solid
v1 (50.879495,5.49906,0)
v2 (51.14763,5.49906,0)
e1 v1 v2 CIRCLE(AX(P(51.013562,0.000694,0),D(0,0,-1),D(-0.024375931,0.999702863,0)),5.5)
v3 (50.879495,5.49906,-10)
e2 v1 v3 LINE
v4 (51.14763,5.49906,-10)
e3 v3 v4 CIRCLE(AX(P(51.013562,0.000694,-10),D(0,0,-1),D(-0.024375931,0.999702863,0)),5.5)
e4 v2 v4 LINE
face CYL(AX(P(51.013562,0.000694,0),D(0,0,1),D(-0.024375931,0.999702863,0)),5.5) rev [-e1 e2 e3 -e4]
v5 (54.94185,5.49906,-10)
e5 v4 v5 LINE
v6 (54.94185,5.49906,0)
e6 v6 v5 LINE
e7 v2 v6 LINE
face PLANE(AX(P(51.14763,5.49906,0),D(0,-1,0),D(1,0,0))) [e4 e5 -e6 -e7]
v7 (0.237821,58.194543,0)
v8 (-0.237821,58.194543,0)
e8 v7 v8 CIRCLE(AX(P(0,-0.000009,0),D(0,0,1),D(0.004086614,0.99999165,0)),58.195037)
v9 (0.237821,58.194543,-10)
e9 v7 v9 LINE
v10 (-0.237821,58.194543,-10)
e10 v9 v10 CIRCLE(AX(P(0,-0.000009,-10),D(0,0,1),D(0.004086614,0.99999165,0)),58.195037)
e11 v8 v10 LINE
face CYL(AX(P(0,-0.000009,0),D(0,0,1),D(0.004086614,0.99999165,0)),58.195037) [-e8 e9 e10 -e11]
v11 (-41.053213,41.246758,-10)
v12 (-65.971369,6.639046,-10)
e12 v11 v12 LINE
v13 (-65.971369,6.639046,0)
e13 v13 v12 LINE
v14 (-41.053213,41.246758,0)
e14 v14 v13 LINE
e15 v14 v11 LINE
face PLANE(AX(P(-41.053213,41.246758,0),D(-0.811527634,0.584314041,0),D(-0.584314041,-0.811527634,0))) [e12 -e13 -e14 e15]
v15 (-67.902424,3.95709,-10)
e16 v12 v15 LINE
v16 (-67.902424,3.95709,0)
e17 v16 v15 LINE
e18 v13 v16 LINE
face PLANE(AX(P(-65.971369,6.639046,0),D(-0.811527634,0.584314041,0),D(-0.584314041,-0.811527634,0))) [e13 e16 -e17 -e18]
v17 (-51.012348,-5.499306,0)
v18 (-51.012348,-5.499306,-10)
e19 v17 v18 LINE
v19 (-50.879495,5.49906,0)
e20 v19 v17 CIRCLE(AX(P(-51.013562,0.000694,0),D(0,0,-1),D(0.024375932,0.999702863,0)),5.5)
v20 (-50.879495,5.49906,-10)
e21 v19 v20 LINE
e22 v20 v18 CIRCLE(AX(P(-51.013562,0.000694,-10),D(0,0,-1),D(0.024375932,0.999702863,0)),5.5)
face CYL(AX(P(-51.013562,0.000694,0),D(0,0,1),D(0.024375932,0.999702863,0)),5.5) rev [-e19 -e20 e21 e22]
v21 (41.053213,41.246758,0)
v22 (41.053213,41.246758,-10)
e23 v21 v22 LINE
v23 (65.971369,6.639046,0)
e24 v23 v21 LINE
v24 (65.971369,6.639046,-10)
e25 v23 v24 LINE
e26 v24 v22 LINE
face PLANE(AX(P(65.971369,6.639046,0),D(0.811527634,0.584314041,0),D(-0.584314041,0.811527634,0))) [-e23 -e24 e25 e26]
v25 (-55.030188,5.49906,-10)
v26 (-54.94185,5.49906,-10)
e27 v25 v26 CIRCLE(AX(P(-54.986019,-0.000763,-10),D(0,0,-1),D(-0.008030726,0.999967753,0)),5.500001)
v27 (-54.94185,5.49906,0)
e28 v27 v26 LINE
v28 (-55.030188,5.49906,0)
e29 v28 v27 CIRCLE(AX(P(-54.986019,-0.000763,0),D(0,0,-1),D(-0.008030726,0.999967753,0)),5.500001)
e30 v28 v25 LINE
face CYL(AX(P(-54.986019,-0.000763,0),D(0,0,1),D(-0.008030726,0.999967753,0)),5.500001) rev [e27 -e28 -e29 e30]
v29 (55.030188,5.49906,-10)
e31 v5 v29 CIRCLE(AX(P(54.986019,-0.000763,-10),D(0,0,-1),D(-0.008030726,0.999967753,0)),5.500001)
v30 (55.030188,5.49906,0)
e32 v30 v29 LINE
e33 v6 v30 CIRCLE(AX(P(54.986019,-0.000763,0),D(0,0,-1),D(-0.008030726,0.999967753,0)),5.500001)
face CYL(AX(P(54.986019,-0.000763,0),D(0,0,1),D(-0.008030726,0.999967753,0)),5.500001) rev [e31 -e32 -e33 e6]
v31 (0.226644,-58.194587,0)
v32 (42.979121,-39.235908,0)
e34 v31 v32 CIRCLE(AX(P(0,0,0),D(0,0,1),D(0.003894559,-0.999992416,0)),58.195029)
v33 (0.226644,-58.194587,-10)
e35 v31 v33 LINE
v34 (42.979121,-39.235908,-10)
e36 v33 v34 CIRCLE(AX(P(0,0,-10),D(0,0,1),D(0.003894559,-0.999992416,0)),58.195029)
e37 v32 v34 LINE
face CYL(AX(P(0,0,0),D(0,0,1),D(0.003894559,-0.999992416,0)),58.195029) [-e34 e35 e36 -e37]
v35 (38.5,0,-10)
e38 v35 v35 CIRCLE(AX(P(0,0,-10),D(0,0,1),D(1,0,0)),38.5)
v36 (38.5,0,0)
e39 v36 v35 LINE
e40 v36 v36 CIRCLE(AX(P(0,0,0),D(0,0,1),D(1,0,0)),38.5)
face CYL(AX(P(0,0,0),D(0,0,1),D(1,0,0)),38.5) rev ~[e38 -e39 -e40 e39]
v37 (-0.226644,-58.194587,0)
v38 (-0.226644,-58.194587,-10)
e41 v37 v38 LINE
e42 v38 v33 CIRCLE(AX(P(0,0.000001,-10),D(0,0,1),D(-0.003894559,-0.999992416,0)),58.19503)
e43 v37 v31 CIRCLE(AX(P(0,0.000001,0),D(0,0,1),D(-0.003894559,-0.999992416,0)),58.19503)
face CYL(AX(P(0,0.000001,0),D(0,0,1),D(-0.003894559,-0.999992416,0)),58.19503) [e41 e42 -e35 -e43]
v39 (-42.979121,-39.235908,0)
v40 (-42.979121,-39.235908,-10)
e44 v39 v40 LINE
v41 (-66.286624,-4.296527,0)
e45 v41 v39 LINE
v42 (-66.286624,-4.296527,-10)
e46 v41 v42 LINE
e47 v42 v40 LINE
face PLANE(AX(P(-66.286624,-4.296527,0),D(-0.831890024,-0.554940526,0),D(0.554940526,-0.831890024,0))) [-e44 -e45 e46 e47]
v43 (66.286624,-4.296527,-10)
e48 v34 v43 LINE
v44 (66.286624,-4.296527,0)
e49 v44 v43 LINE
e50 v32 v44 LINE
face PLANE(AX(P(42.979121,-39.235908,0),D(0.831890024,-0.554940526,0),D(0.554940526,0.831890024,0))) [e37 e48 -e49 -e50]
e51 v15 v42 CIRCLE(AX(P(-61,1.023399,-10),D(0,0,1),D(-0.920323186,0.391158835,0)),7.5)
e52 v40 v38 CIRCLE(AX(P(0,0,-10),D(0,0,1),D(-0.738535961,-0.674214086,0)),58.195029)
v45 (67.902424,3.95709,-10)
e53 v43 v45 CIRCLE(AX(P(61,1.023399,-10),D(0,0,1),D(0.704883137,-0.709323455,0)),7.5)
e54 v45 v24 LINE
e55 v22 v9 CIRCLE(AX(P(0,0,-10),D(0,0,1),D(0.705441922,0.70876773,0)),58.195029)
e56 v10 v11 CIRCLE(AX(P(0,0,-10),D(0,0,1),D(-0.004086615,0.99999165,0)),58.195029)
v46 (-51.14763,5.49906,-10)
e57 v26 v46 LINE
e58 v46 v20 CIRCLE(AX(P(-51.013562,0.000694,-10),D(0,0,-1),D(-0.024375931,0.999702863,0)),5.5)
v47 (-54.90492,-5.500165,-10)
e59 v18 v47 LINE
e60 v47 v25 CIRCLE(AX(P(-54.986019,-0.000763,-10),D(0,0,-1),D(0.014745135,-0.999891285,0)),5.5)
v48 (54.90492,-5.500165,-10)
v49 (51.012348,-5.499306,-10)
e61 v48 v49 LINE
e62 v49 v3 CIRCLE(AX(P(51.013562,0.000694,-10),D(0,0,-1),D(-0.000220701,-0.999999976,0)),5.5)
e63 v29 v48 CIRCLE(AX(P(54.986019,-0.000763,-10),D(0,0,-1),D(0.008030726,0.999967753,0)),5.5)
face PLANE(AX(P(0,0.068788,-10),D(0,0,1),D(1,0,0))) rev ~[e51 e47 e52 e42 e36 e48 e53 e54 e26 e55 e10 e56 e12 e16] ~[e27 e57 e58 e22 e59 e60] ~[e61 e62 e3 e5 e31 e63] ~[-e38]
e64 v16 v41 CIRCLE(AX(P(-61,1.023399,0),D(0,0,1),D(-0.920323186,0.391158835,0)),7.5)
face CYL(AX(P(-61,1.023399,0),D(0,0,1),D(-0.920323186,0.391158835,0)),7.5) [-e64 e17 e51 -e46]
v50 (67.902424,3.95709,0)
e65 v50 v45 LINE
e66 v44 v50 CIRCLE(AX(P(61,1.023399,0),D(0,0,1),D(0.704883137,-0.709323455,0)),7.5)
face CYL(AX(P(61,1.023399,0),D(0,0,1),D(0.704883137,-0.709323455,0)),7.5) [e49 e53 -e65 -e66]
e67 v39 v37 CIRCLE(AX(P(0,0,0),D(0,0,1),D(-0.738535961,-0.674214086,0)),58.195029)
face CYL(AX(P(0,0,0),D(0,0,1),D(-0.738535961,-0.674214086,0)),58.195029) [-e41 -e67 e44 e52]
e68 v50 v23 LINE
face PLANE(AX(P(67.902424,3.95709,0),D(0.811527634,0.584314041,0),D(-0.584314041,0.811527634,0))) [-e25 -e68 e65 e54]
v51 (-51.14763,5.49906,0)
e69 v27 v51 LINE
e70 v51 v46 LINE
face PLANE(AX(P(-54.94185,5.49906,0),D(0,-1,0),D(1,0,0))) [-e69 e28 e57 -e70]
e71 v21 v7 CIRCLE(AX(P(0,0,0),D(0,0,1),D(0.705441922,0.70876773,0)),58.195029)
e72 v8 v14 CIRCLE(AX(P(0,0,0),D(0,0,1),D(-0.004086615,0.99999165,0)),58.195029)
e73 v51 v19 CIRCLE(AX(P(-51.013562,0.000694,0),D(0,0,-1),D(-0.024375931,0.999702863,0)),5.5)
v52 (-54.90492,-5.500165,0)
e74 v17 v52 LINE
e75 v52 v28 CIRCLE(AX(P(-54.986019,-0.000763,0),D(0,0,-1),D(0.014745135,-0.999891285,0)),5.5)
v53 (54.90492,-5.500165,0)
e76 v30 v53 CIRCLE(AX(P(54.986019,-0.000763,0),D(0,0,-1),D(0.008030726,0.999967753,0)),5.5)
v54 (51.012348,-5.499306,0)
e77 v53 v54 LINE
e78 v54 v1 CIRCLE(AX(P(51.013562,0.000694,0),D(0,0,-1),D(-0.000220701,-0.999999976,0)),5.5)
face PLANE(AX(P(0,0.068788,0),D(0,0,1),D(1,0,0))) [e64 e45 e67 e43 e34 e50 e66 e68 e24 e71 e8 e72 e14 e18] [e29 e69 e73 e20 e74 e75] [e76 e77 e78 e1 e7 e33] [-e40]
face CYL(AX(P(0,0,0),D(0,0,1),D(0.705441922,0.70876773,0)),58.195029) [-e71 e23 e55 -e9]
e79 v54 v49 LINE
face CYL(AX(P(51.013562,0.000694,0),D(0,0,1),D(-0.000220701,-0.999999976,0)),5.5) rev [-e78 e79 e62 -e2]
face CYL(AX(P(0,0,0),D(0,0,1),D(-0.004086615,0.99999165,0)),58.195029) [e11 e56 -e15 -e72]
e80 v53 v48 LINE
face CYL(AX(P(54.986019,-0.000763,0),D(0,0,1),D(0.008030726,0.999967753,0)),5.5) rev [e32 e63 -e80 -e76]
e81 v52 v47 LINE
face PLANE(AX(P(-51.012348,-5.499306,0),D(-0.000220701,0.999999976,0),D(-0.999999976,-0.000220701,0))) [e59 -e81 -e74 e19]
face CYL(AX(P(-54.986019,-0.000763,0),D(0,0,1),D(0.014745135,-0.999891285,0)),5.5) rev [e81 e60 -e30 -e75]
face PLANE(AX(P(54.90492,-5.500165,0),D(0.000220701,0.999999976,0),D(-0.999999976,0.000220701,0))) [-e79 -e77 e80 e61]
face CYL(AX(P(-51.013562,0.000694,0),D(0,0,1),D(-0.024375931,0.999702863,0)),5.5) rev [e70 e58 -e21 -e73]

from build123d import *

# Parameters (mm, degrees)
F0_R     = 38.5
F1_DEPTH = 10


# Not quite as in the source:
# - a feature names something its author has since deleted; it is built from what else it names


with BuildPart() as f1:
    # F0 (on Top) → F1 (new body)
    with BuildSketch(Plane.XY):
        with BuildLine():
            Line((-66.2866235273, -4.2965270375), (-42.9791214207, -39.2359080502))
            ThreePointArc((-42.9791214207, -39.2359080502), (-23.5911513271, -53.1988621842), (-0.226643991, -58.1945873009))
            ThreePointArc((-0.226643991, -58.1945873009), (0, -58.1950286418), (0.226643991, -58.1945873009))
            ThreePointArc((0.226643991, -58.1945873009), (23.5911513271, -53.1988621842), (42.9791214207, -39.2359080502))
            Line((42.9791214207, -39.2359080502), (66.2866235273, -4.2965270375))
            ThreePointArc((66.2866235273, -4.2965270375), (68.3602831702, -0.4175146073), (67.9024238921, 3.9570901325))
            Line((67.9024238921, 3.9570901325), (65.9713692122, 6.6390455982))
            Line((65.9713692122, 6.6390455982), (41.053212855, 41.2467583321))
            ThreePointArc((41.053212855, 41.2467583321), (22.3169041562, 53.7458570265), (0.2378206695, 58.1945426991))
            ThreePointArc((0.2378206695, 58.1945426991), (0, 58.1950286418), (-0.2378206695, 58.1945426991))
            ThreePointArc((-0.2378206695, 58.1945426991), (-22.3169041562, 53.7458570265), (-41.053212855, 41.2467583321))
            Line((-41.053212855, 41.2467583321), (-65.9713692122, 6.6390455982))
            Line((-65.9713692122, 6.6390455982), (-67.9024238921, 3.9570901325))
            ThreePointArc((-67.9024238921, 3.9570901325), (-68.3602831702, -0.4175146073), (-66.2866235273, -4.2965270375))
        make_face()
        with BuildLine():
            ThreePointArc((-55.0301875187, 5.4990596786), (-54.9860185236, 5.499237036), (-54.9418495285, 5.4990596786))
            Line((-54.9418495285, 5.4990596786), (-51.1476298855, 5.4990596786))
            ThreePointArc((-51.1476298855, 5.4990596786), (-51.013562259, 5.500693933), (-50.8794946326, 5.4990596786))
            ThreePointArc((-50.8794946326, 5.4990596786), (-45.5139634735, -0.065737976), (-51.0123484011, -5.499305933))
            Line((-51.0123484011, -5.499305933), (-54.9049202804, -5.5001650292))
            ThreePointArc((-54.9049202804, -5.5001650292), (-60.4856618743, -0.0633969362), (-55.0301875187, 5.4990596786))
        make_face(mode=Mode.SUBTRACT)
        Circle(F0_R, mode=Mode.SUBTRACT)
        with BuildLine():
            ThreePointArc((55.0301875187, 5.4990596786), (60.4856618743, -0.0633969362), (54.9049202804, -5.5001650292))
            Line((54.9049202804, -5.5001650292), (51.0123484011, -5.499305933))
            ThreePointArc((51.0123484011, -5.499305933), (45.5139634735, -0.065737976), (50.8794946326, 5.4990596786))
            ThreePointArc((50.8794946326, 5.4990596786), (51.013562259, 5.500693933), (51.1476298855, 5.4990596786))
            Line((51.1476298855, 5.4990596786), (54.9418495285, 5.4990596786))
            ThreePointArc((54.9418495285, 5.4990596786), (54.9860185236, 5.499237036), (55.0301875187, 5.4990596786))
        make_face(mode=Mode.SUBTRACT)
    extrude(amount=-F1_DEPTH)


solid = f1.part
